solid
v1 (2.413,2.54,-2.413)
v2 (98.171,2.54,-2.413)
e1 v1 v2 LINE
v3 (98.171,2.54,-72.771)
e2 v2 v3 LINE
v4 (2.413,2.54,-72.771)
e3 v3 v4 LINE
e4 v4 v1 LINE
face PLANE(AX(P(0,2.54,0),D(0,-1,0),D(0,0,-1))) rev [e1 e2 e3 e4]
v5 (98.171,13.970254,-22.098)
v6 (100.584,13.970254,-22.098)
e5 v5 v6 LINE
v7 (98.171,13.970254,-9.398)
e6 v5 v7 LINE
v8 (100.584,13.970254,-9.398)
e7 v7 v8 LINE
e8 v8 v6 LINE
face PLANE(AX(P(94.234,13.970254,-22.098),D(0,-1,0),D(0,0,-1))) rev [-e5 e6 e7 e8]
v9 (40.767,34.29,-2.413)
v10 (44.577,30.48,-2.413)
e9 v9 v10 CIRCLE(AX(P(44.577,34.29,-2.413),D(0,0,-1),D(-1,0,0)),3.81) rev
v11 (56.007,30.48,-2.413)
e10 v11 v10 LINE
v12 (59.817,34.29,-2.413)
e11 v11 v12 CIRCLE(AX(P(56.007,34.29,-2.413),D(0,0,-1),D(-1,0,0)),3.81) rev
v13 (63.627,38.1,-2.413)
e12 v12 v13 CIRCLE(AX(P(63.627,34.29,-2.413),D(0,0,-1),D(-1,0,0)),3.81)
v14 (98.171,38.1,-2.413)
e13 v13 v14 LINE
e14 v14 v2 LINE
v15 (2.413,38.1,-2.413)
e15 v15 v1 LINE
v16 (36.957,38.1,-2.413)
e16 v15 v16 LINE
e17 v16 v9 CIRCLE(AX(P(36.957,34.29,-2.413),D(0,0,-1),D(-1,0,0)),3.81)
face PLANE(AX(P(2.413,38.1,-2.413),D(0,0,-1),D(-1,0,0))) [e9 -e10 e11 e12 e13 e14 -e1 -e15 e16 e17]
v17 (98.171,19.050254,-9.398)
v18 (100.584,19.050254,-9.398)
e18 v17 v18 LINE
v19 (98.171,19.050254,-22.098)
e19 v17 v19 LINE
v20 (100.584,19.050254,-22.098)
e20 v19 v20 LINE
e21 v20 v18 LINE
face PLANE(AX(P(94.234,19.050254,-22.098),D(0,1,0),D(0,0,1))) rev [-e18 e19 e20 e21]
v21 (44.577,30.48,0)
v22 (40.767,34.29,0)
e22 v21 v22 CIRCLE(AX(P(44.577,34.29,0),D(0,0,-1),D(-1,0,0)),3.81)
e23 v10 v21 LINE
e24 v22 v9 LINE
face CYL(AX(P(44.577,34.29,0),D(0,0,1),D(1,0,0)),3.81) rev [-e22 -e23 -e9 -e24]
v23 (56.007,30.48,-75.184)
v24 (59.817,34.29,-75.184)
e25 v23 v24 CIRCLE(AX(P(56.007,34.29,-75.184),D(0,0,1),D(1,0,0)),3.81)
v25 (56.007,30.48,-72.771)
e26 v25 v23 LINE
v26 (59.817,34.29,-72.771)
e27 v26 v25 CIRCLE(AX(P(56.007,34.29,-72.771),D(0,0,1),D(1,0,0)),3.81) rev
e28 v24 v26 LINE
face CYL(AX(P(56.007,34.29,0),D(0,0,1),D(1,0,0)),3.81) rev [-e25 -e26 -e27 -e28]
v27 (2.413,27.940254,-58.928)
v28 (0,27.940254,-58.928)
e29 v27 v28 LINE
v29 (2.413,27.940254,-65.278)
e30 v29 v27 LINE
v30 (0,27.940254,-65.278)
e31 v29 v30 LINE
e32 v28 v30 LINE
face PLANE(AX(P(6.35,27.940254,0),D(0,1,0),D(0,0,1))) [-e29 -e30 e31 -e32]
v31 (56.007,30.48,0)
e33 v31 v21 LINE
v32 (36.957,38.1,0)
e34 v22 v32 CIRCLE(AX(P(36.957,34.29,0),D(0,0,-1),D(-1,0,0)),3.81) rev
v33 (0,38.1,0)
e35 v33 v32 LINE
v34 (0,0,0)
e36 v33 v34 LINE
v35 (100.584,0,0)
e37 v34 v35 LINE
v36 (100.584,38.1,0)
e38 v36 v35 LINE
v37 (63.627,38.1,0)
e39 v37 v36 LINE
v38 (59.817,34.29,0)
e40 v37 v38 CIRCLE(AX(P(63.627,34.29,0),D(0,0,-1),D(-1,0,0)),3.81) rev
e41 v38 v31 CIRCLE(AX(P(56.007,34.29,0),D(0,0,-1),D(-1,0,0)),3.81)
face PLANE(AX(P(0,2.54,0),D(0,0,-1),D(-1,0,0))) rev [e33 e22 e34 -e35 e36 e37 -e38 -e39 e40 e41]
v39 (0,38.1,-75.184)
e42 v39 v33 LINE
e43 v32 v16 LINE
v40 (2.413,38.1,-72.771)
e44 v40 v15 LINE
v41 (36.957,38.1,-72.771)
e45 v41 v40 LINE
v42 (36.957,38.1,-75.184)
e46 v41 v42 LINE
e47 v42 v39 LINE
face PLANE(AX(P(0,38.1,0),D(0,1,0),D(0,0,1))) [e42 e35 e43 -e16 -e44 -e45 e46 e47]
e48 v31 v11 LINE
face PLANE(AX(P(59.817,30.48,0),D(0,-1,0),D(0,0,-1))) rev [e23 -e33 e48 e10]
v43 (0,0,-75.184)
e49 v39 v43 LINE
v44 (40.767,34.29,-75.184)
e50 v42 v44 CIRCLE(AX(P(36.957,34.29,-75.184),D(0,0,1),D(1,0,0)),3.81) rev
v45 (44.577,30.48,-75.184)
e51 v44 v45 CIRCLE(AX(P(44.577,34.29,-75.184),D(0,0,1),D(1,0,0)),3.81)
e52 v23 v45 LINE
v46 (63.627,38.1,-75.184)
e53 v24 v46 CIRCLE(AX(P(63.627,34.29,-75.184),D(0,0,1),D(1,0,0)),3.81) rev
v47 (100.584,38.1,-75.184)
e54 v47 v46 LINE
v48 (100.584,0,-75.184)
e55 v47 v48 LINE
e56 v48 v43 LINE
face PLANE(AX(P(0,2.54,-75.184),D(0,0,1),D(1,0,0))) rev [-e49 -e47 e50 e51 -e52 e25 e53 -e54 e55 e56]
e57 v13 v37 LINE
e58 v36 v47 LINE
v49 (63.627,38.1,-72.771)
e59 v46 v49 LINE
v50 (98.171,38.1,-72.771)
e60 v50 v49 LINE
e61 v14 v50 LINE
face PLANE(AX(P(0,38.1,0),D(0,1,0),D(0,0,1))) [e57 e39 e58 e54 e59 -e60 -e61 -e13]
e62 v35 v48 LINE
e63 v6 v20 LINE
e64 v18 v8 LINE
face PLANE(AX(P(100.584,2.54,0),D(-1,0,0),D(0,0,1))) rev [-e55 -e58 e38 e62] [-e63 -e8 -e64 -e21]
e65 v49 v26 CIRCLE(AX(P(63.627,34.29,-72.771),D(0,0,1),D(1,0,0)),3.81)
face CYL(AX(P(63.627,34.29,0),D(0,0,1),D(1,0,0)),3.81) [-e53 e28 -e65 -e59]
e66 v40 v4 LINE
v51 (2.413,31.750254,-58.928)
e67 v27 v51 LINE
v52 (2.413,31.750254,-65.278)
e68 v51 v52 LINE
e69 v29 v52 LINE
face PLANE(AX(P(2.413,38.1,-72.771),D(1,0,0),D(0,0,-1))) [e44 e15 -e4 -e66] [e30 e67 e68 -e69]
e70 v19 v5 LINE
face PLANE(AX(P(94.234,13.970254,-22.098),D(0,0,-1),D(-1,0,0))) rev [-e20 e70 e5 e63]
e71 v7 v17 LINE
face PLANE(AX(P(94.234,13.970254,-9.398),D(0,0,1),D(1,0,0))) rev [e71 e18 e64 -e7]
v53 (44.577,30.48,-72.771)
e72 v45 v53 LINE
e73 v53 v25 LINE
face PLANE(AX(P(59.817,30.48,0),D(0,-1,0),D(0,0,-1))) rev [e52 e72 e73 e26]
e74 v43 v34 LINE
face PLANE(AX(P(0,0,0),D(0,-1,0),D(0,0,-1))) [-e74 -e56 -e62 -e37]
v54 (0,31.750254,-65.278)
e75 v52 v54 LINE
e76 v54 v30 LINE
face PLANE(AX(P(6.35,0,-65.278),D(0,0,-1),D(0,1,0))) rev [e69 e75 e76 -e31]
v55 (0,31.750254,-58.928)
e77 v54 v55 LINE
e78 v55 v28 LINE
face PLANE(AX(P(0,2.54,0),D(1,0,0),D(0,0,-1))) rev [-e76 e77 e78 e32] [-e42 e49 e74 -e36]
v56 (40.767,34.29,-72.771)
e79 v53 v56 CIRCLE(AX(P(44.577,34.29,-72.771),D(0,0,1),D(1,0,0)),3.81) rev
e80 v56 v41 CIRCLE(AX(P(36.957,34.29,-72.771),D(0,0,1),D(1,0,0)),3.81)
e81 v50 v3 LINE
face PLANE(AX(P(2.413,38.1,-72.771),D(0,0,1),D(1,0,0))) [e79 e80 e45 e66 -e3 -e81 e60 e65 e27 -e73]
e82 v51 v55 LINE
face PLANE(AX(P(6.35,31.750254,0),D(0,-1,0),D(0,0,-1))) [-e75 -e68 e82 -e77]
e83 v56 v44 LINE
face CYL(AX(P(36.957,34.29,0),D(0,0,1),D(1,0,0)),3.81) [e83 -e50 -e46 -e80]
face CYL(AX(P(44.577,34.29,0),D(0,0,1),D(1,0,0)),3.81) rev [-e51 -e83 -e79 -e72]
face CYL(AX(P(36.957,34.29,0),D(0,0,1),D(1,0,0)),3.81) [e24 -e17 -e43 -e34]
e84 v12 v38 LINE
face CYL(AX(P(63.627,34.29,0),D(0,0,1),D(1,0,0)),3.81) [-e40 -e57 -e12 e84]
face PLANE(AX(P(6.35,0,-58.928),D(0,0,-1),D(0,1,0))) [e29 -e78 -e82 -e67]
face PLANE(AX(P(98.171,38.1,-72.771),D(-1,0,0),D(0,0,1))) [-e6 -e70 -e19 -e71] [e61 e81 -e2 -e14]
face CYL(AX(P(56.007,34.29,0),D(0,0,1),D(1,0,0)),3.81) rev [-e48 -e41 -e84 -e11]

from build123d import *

# Parameters (mm, degrees)
SKETCH1_W           = 100.584
SKETCH1_H           = 75.184
BOSS_EXTRUDE1_DEPTH = 2.54
SKETCH2_W           = 100.584
SKETCH2_H           = 75.184
SKETCH2_W_2         = 95.758
SKETCH2_H_2         = 70.358
BOSS_EXTRUDE2_DEPTH = 35.56
SKETCH3_W           = 19.05
SKETCH3_H           = 7.62
CUT_EXTRUDE1_DEPTH  = 132.230274373
FILLET1_R           = 3.81
SKETCH4_W           = 6.35
SKETCH4_H           = 3.81
CUT_EXTRUDE2_DEPTH  = 6.35
SKETCH5_W           = 12.7
SKETCH5_H           = 5.08
CUT_EXTRUDE3_DEPTH  = 6.35


with BuildPart() as part:
    # Sketch1 → Boss-Extrude1 (new body)
    with BuildSketch(Plane(origin=(0, 0, 0), x_dir=(1, 0, 0), z_dir=(0, 1, 0))):
        with Locations((50.292, 37.592)):
            Rectangle(SKETCH1_W, SKETCH1_H)
    extrude(amount=BOSS_EXTRUDE1_DEPTH)

    # Sketch2 → Boss-Extrude2 (add)
    with BuildSketch(Plane(origin=(0, 2.54, 0), x_dir=(1, 0, 0), z_dir=(0, 1, 0))):
        with Locations((50.292, 37.592)):
            Rectangle(SKETCH2_W, SKETCH2_H)
        with Locations((50.292, 37.592)):
            Rectangle(SKETCH2_W_2, SKETCH2_H_2, mode=Mode.SUBTRACT)
    extrude(amount=BOSS_EXTRUDE2_DEPTH)

    # Sketch3 → Cut-Extrude1 (cut, through all)
    with BuildSketch(Plane(origin=(0, 0, -75.184), x_dir=(-1, 0, 0), z_dir=(0, 0, -1))):
        with Locations((-50.292, 34.29)):
            Rectangle(SKETCH3_W, SKETCH3_H)
    extrude(amount=-CUT_EXTRUDE1_DEPTH, mode=Mode.SUBTRACT)

    # Fillet1
    fillet1_edges = [part.edges().sort_by_distance(p)[0] for p in [
        (40.767, 30.48, -1.2065),
        (59.817, 30.48, -1.2065),
        (59.817, 30.48, -73.9775),
        (40.767, 30.48, -73.9775),
    ]]
    fillet(fillet1_edges, radius=FILLET1_R)
    fillet1_2_edges = [part.edges().sort_by_distance(p)[0] for p in [
        (40.767, 38.1, -1.2065),
        (59.817, 38.1, -1.2065),
        (59.817, 38.1, -73.9775),
        (40.767, 38.1, -73.9775),
    ]]
    fillet(fillet1_2_edges, radius=FILLET1_R - 0.0001)  # a hair under: the kernel refuses the full size

    # Sketch4 → Cut-Extrude2 (cut)
    with BuildSketch(Plane.ZY):
        with Locations((-62.103, 29.845254)):
            Rectangle(SKETCH4_W, SKETCH4_H)
    extrude(amount=-CUT_EXTRUDE2_DEPTH, mode=Mode.SUBTRACT)

    # Sketch5 → Cut-Extrude3 (cut)
    with BuildSketch(Plane(origin=(100.584, 0, 0), x_dir=(0, 0, -1), z_dir=(1, 0, 0))):
        with Locations((15.748, 16.510254)):
            Rectangle(SKETCH5_W, SKETCH5_H)
    extrude(amount=-CUT_EXTRUDE3_DEPTH, mode=Mode.SUBTRACT)


solid = part.part
